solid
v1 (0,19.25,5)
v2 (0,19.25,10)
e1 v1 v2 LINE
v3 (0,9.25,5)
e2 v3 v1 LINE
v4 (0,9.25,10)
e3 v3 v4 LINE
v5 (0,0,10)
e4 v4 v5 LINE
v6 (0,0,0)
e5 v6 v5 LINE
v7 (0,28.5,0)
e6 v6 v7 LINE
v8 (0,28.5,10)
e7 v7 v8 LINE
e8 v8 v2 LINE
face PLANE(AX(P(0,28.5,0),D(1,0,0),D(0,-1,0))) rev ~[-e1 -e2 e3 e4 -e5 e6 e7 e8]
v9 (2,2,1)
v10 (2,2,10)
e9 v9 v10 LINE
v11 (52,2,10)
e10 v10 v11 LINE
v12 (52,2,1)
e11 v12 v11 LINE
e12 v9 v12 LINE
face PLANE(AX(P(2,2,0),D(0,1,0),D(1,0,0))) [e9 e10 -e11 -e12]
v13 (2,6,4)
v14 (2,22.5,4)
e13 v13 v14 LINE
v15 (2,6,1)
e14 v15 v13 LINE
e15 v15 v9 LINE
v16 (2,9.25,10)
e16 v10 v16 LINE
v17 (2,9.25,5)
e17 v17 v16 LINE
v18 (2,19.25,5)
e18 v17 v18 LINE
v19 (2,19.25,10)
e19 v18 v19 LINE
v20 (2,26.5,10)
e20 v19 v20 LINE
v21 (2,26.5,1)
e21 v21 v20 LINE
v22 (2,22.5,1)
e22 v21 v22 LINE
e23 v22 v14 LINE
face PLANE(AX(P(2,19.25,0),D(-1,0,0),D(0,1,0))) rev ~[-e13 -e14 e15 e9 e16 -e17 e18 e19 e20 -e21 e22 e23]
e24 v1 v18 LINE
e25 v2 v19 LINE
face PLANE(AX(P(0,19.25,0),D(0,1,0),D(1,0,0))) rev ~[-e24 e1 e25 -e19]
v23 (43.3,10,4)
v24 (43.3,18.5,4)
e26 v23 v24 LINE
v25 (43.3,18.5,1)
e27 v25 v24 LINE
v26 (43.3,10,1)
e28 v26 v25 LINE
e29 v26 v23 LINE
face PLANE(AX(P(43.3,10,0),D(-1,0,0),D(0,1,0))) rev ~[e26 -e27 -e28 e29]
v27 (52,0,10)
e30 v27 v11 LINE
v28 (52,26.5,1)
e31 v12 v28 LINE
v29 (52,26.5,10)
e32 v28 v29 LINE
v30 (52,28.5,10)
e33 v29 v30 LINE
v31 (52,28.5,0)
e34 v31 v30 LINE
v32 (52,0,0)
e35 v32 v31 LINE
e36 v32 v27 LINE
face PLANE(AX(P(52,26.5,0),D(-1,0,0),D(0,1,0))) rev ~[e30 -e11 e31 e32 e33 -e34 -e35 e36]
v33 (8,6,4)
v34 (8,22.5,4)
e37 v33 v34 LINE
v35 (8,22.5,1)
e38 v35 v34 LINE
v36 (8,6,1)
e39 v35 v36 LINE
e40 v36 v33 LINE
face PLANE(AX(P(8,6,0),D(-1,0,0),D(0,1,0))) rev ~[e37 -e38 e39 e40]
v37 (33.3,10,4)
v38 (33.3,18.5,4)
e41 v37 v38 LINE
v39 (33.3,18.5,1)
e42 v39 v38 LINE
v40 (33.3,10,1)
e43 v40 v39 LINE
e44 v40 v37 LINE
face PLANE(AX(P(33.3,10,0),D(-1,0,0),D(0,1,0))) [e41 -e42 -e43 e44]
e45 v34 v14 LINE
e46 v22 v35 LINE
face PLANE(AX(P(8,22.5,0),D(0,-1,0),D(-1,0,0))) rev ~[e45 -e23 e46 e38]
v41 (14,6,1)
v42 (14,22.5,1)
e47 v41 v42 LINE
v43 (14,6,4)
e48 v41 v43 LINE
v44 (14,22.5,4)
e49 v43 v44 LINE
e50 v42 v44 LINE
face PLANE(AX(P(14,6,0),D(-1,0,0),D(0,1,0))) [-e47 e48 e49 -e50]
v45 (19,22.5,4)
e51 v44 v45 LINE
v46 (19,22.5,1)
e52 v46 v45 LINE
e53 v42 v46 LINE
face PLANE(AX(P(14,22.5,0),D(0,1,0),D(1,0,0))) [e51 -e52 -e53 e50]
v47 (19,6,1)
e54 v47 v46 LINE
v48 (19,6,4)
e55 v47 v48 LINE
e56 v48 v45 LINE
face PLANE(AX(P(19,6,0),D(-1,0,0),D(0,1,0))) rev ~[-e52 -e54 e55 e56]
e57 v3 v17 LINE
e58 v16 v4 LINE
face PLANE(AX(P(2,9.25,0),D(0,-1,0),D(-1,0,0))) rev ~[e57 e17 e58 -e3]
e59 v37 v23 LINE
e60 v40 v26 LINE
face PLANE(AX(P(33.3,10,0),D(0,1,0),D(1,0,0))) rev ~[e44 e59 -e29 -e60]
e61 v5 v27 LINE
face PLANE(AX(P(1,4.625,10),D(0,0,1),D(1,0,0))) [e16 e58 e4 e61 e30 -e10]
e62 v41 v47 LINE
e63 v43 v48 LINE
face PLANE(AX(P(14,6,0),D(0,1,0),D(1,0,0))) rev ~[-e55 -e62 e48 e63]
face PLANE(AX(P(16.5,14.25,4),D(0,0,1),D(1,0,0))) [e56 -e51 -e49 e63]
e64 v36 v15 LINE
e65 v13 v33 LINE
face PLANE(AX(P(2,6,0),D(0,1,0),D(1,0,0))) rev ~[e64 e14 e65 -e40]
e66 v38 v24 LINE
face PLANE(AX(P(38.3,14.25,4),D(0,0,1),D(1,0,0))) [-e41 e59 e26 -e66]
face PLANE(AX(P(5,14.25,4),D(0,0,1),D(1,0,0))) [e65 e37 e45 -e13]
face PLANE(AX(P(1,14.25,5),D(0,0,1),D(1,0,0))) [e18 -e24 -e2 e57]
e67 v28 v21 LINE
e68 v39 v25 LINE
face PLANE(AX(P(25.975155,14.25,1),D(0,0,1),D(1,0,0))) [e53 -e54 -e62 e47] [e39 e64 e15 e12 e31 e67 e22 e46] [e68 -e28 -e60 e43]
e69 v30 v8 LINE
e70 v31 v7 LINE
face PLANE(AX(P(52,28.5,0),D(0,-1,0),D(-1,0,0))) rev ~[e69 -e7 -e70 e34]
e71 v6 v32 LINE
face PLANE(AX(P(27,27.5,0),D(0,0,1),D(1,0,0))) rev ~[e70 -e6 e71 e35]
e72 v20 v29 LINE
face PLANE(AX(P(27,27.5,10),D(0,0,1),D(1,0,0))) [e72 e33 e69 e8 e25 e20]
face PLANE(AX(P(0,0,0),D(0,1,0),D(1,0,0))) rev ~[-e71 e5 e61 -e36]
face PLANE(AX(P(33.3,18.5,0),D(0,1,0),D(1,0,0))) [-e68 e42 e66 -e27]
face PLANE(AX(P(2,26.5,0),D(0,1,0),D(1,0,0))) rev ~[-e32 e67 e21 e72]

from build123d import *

# Parameters (mm, degrees)
F0_W     = 5
F0_H     = 16.5
F0_W_2   = 10
F0_H_2   = 8.5
F1_DEPTH = 1
F2_DEPTH = 4
F0_W_3   = 2
F0_H_3   = 10
F3_DEPTH = 5
F0_W_4   = 50
F0_H_4   = 2
F4_DEPTH = 10


# Not quite as in the source:
# - a feature names something its author has since deleted; it is built from what else it names


with BuildPart() as f1:
    # F0 (on Top) → F1 (new body)
    with BuildSketch(Plane.XY):
        Polygon((2, 6), (2, 2), (52, 2), (52, 6), (52, 26.5), (2, 26.5), (2, 22.5), (8, 22.5), (8, 6), align=None)
        with Locations((16.5, 14.25)):
            Rectangle(F0_W, F0_H, mode=Mode.SUBTRACT)
        with Locations((38.3, 14.25)):
            Rectangle(F0_W_2, F0_H_2, mode=Mode.SUBTRACT)
    extrude(amount=F1_DEPTH)

    # F0 (on Top) → F2 (join)
    with BuildSketch(Plane.XY):
        Polygon((2, 19.25), (2, 9.25), (2, 6), (8, 6), (8, 22.5), (2, 22.5), align=None)
        with Locations((16.5, 14.25)):
            Rectangle(F0_W, F0_H)
        with Locations((38.3, 14.25)):
            Rectangle(F0_W_2, F0_H_2)
    extrude(amount=F2_DEPTH)

    # F0 (on Top) → F3 (join)
    with BuildSketch(Plane.XY):
        with Locations((1, 14.25)):
            Rectangle(F0_W_3, F0_H_3)
    extrude(amount=F3_DEPTH)

    # F0 (on Top) → F4 (join)
    with BuildSketch(Plane.XY):
        with Locations((27, 27.5)):
            Rectangle(F0_W_4, F0_H_4)
        Polygon((0, 28.5), (0, 19.25), (2, 19.25), (2, 22.5), (2, 26.5), (2, 28.5), align=None)
        Polygon((0, 9.25), (0, 0), (2, 0), (2, 2), (2, 6), (2, 9.25), align=None)
        with Locations((27, 1)):
            Rectangle(F0_W_4, F0_H_4)
    extrude(amount=F4_DEPTH)


solid = f1.part
